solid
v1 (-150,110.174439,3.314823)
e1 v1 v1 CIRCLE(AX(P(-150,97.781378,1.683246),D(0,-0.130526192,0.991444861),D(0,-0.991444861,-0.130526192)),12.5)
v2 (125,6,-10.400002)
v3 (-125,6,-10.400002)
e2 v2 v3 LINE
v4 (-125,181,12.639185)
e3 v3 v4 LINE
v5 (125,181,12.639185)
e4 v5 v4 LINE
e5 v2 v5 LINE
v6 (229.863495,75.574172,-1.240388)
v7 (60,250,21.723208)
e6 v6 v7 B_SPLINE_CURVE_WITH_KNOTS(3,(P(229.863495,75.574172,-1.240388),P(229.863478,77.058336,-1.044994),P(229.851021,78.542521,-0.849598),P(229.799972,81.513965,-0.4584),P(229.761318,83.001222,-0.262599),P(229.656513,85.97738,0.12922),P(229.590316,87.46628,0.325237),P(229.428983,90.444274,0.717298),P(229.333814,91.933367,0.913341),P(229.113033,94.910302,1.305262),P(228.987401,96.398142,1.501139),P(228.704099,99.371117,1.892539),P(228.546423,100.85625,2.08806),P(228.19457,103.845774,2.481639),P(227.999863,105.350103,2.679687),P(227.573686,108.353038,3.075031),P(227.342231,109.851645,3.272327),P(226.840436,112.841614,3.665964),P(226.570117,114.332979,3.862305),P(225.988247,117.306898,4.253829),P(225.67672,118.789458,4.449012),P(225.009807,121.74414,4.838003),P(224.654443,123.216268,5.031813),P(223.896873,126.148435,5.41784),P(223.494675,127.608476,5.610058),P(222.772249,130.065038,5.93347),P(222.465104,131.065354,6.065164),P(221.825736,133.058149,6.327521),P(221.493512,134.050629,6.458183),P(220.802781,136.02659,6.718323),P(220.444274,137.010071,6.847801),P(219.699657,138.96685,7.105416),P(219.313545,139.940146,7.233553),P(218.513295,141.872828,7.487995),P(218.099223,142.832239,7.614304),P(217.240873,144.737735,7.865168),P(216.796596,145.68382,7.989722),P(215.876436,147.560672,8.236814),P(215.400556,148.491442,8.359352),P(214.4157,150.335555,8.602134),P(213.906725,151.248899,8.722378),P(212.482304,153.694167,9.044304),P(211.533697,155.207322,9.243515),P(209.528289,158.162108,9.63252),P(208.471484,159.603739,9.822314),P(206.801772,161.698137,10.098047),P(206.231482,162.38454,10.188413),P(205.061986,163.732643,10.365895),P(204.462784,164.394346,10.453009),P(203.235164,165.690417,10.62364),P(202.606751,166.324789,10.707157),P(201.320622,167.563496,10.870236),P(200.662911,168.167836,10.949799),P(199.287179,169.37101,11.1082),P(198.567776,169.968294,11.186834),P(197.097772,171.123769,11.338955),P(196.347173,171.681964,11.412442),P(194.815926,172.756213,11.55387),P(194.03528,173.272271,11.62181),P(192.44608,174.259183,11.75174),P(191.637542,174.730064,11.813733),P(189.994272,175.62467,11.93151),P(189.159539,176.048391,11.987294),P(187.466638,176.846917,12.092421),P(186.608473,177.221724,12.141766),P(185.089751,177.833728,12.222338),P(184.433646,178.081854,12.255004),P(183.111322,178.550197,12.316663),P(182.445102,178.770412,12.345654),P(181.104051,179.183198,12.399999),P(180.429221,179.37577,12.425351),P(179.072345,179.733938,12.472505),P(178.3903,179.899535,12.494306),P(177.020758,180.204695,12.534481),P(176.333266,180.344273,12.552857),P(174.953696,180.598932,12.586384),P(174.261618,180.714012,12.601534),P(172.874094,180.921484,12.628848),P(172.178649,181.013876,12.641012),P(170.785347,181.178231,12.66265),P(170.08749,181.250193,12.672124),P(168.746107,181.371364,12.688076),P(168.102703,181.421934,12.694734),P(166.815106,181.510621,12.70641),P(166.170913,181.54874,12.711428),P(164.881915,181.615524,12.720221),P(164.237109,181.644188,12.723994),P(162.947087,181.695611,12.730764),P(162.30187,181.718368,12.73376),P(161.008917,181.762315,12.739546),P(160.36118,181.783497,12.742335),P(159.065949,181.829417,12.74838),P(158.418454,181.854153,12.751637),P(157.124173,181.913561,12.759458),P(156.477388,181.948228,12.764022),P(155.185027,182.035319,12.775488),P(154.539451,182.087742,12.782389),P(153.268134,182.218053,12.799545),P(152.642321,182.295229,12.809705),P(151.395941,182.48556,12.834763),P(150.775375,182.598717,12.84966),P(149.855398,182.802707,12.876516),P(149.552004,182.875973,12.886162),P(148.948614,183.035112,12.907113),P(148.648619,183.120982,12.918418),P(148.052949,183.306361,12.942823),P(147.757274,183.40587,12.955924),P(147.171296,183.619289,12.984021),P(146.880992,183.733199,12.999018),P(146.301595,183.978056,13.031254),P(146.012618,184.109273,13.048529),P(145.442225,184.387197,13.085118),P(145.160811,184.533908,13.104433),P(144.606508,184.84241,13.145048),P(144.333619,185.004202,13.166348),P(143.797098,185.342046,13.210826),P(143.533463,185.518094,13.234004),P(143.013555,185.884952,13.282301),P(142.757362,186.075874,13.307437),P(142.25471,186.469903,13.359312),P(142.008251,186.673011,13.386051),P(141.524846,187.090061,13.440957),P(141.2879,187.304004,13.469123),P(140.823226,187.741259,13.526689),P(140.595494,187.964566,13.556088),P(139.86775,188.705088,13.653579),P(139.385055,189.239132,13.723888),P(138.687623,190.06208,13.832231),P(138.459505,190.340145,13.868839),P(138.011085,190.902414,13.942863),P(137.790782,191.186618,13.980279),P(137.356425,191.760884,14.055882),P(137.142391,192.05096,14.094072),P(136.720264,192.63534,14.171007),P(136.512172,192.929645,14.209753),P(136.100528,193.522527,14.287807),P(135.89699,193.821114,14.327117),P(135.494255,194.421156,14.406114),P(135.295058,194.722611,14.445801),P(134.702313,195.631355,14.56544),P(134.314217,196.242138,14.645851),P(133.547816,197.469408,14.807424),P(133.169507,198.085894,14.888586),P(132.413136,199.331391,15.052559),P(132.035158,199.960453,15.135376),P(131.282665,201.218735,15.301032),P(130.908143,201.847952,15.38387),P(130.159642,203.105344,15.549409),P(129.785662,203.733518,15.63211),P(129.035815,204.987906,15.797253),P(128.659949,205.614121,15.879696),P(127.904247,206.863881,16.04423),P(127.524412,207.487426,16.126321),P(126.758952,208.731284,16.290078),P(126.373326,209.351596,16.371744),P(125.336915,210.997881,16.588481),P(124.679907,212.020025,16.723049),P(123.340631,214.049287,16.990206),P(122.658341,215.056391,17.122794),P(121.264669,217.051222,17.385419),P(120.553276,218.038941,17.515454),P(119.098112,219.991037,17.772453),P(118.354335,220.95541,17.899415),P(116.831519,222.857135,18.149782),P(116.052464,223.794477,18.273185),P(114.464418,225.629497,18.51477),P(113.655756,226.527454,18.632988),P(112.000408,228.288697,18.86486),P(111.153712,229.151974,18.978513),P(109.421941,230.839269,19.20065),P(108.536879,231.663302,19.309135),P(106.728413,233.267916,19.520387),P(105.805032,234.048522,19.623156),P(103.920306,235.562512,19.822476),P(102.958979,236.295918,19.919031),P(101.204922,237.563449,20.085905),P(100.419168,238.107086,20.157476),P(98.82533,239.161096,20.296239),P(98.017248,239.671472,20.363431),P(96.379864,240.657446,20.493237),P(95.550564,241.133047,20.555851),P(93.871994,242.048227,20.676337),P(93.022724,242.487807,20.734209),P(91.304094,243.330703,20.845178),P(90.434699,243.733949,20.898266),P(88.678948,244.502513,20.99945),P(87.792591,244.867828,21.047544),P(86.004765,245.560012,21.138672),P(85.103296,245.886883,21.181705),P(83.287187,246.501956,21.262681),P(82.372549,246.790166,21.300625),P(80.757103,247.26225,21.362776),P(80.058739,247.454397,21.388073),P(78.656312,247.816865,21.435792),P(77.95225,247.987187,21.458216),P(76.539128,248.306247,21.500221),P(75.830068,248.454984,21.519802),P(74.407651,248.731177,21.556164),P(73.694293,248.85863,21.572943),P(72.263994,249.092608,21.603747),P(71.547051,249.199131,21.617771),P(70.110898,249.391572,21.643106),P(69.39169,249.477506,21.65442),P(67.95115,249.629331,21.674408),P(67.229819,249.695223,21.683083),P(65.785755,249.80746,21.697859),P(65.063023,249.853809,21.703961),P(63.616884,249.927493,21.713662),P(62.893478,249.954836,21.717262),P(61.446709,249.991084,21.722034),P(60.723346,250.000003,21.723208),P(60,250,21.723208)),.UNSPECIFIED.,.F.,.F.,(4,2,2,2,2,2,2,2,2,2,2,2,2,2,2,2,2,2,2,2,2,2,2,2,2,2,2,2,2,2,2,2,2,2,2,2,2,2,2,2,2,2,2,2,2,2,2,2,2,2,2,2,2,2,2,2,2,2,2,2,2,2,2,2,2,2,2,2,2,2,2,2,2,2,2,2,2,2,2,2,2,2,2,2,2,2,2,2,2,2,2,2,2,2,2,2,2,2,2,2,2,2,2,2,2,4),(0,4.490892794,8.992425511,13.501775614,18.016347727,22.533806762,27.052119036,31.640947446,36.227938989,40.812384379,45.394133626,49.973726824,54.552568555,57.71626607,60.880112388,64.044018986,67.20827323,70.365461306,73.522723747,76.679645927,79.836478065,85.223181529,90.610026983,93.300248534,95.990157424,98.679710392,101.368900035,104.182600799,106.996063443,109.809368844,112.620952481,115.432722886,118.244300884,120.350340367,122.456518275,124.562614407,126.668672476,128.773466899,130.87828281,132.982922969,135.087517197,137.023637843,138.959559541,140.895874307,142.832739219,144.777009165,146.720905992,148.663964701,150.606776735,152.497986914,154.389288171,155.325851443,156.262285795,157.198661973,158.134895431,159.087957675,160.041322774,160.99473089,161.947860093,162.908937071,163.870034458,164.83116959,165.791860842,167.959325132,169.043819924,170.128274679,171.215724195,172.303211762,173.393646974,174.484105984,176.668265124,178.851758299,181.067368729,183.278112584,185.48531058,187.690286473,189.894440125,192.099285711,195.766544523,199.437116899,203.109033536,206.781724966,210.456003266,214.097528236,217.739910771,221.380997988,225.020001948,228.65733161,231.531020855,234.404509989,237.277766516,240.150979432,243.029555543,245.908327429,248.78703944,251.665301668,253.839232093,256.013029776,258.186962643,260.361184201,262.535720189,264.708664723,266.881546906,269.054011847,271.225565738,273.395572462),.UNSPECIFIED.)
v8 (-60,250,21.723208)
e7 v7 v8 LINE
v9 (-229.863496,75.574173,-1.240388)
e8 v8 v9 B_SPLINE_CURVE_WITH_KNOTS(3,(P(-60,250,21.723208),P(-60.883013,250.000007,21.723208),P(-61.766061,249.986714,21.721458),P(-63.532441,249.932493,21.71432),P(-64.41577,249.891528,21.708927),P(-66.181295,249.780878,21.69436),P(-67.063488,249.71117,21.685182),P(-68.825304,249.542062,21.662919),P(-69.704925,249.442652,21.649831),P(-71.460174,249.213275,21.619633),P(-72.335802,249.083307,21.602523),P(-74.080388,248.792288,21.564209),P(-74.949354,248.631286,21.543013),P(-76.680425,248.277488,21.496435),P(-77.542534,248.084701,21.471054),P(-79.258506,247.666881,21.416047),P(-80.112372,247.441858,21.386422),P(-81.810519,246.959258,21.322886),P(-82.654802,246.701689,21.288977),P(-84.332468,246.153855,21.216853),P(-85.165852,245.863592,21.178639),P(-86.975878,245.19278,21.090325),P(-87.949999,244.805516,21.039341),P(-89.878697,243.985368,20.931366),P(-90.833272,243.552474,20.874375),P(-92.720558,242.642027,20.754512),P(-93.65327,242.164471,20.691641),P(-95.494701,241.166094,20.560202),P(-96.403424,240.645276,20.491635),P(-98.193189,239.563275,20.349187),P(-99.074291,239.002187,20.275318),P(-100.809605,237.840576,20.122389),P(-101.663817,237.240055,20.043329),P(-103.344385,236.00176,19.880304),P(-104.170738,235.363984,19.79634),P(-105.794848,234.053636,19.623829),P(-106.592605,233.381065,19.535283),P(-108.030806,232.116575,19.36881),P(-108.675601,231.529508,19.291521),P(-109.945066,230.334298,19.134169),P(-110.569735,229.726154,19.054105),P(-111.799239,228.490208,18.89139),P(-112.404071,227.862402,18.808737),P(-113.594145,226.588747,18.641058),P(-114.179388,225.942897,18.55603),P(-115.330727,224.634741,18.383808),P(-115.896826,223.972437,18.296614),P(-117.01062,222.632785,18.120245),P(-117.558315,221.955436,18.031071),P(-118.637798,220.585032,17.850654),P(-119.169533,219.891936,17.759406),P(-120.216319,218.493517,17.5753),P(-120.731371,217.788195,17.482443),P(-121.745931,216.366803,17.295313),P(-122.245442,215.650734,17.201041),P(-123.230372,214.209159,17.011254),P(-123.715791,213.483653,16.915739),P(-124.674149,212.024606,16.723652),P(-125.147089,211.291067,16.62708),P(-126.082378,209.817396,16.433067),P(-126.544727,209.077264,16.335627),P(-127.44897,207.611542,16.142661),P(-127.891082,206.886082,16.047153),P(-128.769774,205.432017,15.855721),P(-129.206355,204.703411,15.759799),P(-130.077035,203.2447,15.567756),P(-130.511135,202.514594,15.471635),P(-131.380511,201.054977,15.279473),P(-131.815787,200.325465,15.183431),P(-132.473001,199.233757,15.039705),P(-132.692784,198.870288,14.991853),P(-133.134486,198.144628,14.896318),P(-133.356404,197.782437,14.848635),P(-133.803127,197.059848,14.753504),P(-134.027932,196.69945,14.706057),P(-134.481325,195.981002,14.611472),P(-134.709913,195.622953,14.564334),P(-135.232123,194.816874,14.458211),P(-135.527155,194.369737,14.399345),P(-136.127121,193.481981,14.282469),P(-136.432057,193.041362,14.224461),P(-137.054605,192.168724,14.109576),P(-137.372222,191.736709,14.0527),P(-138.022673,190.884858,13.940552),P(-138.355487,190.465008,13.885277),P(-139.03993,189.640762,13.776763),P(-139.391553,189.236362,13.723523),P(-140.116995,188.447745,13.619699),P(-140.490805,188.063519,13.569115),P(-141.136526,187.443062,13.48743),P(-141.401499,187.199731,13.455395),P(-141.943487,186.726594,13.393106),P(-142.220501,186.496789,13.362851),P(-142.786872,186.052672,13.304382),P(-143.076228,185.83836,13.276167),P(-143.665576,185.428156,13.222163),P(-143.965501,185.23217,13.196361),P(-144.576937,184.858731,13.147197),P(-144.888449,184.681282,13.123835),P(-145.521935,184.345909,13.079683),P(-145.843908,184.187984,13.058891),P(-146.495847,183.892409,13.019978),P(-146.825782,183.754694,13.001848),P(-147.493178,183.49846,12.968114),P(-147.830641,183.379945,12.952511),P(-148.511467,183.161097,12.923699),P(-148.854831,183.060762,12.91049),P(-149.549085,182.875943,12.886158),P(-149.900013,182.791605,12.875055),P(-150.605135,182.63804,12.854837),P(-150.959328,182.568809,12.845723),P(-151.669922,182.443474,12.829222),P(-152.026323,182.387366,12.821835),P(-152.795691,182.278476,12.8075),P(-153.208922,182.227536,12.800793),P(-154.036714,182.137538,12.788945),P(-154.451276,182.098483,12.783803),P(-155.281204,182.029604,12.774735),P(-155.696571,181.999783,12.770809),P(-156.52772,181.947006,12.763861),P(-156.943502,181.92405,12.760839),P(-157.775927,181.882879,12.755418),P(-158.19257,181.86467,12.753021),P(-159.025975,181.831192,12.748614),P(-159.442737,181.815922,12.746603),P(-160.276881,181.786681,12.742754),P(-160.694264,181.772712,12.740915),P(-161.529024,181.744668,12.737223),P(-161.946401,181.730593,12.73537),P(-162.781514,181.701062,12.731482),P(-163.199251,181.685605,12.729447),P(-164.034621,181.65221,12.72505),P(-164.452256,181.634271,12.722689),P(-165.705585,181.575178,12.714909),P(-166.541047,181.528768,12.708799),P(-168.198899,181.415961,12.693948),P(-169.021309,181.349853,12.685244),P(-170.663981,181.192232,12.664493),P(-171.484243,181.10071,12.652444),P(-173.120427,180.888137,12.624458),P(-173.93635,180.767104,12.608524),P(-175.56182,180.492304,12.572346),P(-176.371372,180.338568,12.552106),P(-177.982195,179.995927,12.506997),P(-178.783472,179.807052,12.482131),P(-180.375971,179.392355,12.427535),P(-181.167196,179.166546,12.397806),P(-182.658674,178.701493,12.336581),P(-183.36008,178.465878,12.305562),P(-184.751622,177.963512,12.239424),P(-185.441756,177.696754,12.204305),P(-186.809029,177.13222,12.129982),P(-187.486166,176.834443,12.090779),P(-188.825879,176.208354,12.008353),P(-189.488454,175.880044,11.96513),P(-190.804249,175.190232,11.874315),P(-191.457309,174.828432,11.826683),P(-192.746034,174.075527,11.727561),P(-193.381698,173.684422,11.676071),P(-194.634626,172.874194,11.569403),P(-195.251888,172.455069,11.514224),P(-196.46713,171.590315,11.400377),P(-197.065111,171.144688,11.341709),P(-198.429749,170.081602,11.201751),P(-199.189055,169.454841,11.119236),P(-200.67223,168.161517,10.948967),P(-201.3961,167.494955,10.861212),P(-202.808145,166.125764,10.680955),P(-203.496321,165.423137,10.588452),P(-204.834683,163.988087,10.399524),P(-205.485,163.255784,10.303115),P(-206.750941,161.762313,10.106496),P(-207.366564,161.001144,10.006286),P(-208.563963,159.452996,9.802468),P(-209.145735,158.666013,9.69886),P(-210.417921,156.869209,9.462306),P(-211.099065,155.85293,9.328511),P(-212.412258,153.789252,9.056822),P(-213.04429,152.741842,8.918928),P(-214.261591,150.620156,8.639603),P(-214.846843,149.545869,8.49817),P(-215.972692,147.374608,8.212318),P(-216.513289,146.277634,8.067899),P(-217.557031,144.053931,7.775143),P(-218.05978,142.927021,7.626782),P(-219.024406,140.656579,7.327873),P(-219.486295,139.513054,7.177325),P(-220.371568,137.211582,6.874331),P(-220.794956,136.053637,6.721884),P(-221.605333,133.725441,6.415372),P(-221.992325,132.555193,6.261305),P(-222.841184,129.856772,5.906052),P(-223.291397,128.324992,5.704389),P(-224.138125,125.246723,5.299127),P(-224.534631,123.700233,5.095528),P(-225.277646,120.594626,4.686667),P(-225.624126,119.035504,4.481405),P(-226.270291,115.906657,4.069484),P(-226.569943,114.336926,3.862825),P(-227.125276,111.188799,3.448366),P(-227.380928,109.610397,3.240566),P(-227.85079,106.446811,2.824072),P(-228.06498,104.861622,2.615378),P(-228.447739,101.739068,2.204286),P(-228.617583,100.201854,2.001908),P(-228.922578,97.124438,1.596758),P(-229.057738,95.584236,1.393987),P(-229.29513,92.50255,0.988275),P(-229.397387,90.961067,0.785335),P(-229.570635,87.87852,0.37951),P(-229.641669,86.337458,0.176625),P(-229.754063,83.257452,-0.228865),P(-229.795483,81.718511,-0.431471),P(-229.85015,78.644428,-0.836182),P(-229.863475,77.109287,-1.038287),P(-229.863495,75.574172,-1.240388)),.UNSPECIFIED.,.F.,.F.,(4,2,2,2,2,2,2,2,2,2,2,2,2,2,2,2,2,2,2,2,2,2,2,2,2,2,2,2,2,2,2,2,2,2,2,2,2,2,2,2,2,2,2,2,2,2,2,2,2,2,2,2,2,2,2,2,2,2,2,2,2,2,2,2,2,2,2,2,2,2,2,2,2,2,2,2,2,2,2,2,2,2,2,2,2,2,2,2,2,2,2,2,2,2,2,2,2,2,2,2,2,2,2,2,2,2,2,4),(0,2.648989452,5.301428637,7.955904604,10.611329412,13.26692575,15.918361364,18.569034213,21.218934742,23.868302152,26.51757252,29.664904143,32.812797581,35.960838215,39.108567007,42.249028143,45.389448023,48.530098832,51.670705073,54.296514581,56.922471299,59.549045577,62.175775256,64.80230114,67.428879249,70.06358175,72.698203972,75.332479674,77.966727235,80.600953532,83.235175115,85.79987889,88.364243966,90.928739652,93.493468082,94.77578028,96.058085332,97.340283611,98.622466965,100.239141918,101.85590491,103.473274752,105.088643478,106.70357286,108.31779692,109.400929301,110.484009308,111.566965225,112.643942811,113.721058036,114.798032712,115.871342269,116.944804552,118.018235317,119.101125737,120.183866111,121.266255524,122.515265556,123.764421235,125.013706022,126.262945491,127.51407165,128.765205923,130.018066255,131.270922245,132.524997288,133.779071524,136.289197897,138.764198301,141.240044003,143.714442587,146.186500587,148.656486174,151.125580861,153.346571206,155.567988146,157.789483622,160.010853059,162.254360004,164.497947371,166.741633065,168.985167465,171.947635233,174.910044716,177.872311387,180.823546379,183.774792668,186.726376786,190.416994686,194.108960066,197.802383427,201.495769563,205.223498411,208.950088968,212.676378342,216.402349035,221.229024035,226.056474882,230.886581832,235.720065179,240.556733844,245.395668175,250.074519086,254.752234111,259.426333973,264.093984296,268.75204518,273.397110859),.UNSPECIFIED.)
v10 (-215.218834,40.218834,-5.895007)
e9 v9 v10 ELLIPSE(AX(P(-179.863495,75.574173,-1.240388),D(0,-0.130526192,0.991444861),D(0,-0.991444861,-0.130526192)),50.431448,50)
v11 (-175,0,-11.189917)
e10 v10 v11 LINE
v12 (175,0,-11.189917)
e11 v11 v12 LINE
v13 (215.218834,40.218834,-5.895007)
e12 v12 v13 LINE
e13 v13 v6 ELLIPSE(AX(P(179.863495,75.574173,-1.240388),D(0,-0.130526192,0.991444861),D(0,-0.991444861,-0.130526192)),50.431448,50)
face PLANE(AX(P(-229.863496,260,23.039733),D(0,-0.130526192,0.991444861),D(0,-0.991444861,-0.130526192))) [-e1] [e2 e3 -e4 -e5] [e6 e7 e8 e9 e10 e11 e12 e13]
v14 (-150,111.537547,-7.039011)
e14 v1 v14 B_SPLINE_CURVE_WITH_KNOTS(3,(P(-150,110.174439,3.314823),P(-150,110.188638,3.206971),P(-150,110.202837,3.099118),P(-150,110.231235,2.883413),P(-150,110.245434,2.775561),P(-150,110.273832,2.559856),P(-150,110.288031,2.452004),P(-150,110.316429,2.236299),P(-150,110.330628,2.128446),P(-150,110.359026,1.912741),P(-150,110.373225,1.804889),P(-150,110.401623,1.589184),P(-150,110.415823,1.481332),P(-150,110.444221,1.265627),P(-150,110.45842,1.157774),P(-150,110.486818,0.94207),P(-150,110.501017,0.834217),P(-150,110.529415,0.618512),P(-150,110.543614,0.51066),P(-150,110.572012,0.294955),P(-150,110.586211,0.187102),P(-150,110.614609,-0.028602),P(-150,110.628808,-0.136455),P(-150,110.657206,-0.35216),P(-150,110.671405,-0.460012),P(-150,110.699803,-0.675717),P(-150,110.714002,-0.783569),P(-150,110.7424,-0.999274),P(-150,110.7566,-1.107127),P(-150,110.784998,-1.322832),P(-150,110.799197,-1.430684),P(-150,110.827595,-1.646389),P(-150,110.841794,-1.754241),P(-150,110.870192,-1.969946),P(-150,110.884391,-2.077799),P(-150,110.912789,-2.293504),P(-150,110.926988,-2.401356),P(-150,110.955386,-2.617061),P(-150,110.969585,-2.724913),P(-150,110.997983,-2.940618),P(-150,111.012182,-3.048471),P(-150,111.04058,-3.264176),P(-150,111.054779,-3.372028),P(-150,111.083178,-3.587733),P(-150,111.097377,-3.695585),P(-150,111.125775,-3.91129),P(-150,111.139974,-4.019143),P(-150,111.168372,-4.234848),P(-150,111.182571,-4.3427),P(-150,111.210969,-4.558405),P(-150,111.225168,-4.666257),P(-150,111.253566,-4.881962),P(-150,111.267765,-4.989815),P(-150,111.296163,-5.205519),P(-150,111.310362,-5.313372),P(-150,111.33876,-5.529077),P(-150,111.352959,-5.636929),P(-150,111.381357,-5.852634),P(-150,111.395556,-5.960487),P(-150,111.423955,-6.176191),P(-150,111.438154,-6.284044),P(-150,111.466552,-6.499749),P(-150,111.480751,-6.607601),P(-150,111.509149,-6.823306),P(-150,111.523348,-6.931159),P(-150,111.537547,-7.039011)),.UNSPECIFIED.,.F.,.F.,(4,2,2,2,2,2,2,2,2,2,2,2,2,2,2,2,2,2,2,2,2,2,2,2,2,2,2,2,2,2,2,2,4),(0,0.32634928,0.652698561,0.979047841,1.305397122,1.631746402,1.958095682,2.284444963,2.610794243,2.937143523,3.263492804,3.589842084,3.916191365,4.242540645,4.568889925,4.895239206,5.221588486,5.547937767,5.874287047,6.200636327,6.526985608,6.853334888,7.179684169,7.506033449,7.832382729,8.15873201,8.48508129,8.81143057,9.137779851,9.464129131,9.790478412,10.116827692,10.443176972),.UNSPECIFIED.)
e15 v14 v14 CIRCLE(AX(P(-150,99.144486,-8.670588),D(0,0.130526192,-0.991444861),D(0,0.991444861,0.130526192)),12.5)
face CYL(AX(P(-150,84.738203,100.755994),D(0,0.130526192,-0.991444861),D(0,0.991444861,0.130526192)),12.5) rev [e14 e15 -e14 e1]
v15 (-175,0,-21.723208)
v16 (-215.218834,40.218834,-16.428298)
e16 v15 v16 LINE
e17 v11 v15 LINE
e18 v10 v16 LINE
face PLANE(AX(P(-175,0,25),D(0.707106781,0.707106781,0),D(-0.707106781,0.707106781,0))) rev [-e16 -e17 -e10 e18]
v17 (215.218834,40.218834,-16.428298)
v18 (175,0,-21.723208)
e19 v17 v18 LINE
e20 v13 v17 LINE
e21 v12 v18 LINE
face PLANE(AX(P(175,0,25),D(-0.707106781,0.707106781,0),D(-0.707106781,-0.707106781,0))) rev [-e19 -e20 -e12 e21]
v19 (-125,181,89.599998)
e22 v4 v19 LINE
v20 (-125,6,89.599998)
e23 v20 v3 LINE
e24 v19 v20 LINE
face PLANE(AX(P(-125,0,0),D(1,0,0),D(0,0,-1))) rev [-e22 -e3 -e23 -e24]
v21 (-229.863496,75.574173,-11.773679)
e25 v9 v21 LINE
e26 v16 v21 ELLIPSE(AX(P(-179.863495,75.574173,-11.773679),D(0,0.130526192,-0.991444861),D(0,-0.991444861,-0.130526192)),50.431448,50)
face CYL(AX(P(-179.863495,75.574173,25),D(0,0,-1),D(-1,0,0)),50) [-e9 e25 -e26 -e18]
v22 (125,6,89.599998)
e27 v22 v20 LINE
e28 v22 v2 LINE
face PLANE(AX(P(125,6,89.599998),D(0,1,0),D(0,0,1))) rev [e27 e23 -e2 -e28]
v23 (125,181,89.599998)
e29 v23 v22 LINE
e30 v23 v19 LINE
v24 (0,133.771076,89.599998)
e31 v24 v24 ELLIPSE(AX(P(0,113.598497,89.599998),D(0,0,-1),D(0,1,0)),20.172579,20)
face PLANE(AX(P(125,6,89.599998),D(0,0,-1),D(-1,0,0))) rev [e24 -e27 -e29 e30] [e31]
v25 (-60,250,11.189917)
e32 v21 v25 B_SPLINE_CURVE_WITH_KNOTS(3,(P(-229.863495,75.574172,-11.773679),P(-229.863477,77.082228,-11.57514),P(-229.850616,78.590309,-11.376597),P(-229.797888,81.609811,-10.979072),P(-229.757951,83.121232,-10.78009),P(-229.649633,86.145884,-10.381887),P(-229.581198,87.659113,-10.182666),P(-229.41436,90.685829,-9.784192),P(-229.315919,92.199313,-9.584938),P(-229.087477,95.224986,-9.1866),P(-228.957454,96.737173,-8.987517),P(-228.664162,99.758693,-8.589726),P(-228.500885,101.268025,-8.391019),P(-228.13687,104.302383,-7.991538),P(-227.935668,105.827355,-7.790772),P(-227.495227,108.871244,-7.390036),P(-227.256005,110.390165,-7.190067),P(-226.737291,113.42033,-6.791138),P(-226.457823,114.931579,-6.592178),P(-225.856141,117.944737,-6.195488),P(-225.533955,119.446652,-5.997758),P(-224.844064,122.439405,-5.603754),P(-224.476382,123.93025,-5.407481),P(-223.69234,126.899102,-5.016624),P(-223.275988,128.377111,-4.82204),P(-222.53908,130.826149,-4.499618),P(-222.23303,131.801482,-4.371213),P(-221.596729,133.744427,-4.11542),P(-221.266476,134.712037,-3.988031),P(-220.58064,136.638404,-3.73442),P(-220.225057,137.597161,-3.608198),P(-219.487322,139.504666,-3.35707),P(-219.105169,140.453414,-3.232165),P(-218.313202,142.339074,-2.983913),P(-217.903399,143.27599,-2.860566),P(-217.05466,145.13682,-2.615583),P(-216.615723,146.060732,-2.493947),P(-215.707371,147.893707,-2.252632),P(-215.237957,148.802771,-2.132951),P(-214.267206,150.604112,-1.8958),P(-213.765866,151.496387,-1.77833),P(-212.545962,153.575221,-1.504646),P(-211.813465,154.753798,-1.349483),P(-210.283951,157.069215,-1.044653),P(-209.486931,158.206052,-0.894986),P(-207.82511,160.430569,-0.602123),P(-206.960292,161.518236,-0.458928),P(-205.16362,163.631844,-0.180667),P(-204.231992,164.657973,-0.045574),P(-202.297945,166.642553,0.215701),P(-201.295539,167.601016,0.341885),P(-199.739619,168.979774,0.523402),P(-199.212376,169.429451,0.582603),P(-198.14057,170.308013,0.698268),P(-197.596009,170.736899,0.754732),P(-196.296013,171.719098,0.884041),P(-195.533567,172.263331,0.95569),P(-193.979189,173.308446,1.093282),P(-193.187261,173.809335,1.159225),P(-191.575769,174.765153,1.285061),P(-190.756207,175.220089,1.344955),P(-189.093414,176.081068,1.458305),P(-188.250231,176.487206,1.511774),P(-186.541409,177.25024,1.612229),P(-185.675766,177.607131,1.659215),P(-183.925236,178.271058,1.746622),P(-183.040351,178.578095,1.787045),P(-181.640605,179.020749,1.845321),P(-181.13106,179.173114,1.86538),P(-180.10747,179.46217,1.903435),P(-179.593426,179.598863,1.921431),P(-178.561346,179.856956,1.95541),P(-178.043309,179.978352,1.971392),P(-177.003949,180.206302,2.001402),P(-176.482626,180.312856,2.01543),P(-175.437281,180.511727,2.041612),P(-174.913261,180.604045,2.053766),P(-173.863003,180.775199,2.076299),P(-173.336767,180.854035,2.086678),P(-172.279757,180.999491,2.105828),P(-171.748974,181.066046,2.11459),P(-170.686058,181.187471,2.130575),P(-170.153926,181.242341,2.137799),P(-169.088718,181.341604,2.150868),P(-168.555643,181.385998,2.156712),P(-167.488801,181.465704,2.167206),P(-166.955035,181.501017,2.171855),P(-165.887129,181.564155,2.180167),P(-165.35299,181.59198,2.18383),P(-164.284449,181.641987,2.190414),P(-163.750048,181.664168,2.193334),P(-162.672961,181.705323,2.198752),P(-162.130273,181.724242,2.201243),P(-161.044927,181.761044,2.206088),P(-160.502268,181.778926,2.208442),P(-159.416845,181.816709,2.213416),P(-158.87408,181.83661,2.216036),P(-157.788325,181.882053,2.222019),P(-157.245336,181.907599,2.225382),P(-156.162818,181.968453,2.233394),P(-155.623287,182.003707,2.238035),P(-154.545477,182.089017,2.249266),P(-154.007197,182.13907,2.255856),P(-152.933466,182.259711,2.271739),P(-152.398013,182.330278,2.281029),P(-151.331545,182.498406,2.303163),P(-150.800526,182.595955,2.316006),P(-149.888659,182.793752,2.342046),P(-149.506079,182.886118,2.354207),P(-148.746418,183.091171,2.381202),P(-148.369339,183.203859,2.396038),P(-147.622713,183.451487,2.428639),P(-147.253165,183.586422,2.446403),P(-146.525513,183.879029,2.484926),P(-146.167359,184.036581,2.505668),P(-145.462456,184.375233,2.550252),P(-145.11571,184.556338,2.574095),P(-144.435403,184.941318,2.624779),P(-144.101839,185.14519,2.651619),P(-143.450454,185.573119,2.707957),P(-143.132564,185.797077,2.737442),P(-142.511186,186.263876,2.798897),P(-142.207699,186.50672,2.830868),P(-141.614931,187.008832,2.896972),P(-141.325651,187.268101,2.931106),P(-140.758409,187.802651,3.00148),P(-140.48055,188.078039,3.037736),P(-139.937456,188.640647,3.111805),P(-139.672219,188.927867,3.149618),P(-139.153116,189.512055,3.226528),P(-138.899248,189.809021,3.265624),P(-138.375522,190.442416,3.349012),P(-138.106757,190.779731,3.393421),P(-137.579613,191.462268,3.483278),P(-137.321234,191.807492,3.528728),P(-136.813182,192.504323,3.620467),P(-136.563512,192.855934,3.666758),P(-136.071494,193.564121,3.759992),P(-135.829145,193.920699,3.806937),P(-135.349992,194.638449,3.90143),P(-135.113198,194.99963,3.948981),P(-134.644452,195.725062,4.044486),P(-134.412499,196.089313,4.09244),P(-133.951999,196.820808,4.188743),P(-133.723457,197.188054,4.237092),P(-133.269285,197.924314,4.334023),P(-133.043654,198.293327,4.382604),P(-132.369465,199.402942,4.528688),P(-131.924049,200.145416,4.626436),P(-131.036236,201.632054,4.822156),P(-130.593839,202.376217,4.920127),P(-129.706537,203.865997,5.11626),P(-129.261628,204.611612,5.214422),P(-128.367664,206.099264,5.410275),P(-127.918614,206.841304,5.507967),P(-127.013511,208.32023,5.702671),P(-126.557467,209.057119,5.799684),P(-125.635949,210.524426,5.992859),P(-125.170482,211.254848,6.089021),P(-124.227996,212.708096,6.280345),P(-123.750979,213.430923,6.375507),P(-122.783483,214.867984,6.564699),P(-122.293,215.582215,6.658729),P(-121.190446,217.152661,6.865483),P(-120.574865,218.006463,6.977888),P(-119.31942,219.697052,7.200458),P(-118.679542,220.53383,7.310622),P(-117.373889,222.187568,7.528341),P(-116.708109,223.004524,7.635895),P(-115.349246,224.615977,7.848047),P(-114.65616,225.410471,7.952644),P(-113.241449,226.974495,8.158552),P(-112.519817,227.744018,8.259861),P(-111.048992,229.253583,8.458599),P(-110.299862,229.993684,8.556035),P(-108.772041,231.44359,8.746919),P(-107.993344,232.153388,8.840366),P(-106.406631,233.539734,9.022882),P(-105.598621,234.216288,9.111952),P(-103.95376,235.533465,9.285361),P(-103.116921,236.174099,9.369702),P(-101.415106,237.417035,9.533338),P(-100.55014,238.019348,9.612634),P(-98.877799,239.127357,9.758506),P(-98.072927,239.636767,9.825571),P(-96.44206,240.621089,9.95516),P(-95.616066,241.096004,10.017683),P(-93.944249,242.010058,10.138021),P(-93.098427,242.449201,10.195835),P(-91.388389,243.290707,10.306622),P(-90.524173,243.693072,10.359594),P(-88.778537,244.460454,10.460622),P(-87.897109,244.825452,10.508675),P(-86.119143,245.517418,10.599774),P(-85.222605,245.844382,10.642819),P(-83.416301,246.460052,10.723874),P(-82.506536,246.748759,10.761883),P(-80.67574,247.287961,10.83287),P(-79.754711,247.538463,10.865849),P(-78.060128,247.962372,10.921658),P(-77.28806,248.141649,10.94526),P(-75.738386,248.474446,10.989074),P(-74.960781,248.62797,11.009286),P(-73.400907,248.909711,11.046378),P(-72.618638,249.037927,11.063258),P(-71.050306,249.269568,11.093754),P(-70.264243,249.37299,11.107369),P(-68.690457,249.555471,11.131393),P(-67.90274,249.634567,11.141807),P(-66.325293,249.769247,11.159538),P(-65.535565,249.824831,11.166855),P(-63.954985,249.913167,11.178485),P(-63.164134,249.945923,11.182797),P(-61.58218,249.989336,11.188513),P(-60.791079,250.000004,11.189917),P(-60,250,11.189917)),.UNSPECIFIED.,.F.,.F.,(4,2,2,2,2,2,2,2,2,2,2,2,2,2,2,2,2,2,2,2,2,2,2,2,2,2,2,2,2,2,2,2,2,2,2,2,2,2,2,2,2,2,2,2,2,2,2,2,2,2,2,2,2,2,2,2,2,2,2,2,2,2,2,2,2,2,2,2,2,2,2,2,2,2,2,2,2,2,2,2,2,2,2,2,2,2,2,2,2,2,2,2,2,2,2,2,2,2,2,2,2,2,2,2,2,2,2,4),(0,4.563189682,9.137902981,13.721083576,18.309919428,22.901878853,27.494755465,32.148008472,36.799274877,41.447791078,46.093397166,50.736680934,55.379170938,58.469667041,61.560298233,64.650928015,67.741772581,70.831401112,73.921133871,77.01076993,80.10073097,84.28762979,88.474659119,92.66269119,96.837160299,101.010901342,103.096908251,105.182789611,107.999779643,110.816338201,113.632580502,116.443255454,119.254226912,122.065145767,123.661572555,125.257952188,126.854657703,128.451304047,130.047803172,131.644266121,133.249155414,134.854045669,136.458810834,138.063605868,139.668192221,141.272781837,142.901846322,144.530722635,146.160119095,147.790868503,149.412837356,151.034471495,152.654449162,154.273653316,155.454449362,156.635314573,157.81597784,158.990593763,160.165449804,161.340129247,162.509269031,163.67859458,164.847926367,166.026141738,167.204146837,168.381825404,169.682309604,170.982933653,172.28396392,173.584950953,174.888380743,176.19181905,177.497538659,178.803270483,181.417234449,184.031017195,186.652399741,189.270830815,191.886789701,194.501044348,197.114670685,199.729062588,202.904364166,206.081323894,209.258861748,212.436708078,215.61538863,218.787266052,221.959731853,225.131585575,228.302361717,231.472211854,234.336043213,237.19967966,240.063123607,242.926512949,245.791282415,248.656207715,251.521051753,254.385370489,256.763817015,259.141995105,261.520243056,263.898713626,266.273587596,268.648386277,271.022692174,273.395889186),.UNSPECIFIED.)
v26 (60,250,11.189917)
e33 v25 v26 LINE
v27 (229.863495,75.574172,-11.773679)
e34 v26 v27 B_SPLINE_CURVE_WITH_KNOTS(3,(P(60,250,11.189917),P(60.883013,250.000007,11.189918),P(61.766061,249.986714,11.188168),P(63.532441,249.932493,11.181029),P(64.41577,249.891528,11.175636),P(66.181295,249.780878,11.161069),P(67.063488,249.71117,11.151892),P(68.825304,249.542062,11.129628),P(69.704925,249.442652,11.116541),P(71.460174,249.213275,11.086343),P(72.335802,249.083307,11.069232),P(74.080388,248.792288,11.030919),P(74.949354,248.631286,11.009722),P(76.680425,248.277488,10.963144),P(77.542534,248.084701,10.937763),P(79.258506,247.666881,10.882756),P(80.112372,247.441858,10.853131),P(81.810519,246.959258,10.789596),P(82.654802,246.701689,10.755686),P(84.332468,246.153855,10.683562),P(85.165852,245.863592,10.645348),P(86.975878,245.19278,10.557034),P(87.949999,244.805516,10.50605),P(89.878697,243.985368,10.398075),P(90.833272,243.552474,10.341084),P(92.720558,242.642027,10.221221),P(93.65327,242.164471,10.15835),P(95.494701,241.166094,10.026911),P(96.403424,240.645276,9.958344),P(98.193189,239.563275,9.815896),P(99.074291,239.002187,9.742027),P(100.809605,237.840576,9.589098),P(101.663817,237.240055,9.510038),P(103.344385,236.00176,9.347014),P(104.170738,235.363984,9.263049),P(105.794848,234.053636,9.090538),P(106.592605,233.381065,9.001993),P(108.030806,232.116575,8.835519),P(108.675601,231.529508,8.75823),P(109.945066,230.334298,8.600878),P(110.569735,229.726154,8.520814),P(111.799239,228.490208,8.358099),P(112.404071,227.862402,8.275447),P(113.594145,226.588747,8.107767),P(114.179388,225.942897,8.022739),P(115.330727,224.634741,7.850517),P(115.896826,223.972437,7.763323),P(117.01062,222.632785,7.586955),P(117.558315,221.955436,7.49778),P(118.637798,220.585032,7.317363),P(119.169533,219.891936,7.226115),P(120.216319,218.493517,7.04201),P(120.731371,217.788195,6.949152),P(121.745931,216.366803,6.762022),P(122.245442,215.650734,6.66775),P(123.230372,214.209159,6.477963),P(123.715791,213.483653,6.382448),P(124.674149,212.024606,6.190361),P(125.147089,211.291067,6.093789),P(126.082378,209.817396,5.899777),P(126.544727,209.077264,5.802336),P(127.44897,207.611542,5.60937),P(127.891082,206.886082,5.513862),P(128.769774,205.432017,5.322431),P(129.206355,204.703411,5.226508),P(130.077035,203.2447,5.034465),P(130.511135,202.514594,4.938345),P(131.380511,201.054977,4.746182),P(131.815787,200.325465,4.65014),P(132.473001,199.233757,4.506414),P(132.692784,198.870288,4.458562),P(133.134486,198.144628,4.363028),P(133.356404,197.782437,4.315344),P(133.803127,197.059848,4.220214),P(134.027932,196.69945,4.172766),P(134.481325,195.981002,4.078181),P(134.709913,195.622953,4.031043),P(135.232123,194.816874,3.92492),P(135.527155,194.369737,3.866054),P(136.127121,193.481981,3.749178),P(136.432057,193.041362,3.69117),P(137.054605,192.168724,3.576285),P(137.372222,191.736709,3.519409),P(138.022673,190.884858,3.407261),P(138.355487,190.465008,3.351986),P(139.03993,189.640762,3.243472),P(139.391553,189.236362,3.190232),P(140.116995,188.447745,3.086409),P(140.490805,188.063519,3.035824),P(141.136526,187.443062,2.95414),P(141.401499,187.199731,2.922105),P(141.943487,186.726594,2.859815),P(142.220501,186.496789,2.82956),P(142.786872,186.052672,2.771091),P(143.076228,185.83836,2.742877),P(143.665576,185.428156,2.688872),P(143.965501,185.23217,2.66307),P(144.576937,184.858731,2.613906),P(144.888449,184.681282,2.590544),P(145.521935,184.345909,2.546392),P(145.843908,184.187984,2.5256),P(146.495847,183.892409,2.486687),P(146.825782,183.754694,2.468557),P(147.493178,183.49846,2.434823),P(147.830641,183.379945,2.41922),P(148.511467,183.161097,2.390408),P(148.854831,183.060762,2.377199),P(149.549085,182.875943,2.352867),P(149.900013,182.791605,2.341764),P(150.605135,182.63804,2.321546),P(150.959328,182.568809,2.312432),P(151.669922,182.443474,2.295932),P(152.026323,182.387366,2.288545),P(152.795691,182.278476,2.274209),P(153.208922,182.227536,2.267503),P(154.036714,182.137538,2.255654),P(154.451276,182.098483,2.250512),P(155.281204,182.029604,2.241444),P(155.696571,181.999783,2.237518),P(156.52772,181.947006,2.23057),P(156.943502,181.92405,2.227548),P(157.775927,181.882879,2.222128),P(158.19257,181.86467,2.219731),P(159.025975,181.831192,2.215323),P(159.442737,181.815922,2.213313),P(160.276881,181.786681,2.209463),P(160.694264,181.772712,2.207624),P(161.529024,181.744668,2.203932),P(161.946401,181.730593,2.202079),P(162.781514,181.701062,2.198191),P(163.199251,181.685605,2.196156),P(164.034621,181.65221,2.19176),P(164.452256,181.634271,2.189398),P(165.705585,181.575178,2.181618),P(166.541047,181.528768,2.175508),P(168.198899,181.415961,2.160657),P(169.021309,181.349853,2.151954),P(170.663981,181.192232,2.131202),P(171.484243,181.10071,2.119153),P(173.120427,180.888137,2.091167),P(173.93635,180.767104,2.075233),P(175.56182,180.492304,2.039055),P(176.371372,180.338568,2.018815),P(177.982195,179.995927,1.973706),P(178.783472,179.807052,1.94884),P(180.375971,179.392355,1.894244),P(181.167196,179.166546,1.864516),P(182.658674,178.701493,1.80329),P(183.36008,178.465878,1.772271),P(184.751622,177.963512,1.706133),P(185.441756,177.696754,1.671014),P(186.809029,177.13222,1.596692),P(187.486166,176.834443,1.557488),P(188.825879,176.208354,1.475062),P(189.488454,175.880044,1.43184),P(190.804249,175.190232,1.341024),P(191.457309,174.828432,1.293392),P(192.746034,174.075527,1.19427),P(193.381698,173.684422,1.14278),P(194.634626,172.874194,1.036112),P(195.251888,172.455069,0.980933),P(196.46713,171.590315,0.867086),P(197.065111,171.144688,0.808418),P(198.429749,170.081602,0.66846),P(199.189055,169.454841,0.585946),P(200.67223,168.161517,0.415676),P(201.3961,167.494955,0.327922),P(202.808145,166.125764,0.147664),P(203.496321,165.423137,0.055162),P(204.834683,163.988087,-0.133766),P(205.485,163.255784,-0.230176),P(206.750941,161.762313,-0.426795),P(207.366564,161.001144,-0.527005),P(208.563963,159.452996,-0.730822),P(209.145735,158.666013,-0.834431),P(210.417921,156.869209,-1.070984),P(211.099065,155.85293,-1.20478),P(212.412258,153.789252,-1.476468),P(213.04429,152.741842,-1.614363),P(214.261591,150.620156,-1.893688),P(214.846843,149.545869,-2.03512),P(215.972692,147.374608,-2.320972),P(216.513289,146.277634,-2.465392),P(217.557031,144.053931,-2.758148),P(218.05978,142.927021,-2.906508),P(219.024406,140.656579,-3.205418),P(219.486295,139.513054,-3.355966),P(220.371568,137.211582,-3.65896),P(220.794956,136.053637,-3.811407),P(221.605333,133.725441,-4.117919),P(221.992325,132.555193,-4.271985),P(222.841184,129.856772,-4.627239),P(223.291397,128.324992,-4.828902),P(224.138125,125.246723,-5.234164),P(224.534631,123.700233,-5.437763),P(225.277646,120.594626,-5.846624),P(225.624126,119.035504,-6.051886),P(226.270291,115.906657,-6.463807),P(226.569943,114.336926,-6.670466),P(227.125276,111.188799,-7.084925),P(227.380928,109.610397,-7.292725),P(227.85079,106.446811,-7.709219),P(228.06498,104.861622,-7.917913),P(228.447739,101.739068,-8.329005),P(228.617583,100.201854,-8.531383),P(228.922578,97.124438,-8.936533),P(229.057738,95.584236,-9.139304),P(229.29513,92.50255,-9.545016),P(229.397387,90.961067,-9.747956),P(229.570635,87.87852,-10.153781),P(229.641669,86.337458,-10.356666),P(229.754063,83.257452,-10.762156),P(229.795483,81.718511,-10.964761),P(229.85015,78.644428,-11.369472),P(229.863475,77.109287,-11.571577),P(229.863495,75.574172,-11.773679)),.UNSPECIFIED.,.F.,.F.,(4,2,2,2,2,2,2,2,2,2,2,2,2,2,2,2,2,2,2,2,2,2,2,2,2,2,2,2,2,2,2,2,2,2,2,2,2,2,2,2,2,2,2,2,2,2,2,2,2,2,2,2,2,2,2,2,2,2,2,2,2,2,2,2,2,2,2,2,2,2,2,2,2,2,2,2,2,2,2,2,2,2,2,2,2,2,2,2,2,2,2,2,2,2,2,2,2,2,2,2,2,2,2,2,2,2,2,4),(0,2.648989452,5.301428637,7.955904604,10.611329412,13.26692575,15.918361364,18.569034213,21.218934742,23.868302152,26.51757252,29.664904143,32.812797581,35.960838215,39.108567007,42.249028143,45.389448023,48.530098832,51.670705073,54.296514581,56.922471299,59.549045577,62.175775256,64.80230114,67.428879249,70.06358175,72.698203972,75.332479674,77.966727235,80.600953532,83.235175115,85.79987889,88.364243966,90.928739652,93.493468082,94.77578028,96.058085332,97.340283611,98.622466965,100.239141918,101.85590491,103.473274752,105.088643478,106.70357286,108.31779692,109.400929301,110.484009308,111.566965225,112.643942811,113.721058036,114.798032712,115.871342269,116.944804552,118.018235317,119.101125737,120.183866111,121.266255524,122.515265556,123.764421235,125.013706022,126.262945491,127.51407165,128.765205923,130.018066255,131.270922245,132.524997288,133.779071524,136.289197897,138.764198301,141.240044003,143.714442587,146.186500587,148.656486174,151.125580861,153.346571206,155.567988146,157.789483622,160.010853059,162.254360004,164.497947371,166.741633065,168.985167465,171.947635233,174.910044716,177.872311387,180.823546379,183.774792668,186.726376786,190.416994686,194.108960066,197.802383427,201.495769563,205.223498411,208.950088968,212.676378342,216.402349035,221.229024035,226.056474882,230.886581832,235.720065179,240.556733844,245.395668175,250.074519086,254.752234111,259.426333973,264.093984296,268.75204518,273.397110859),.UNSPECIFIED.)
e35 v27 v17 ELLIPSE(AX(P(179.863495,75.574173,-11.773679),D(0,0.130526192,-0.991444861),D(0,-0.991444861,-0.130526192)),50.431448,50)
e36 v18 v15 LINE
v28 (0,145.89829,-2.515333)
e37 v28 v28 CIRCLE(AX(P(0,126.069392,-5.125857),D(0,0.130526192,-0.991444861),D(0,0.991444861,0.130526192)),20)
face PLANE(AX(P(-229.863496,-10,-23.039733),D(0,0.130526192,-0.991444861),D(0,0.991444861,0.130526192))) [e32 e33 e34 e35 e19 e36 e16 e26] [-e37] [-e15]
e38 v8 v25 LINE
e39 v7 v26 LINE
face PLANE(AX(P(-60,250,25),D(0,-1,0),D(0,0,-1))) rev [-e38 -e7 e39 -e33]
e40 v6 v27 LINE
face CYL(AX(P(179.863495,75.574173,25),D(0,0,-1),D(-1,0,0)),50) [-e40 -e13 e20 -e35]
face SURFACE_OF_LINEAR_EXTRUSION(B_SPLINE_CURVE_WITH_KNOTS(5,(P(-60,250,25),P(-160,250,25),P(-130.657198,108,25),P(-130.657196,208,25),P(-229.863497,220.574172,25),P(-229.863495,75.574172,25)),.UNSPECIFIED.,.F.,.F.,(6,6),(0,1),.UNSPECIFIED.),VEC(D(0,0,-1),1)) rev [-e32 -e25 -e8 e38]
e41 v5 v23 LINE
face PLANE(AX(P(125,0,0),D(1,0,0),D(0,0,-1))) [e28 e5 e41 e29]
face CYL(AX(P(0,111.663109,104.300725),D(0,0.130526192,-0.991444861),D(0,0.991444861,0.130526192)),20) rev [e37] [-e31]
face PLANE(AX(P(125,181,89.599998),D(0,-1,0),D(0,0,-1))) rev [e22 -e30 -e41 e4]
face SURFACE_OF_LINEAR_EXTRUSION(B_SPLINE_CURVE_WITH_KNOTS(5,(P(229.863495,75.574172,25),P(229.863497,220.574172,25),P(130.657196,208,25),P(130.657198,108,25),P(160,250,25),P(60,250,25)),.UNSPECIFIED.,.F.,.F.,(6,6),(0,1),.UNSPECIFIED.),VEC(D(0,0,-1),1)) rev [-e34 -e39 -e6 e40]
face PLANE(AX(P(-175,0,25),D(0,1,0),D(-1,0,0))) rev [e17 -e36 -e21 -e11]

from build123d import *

# Parameters (mm, degrees)
BOSS_EXTRUDE1_START     = -25
BOSS_EXTRUDE1_DEPTH     = 50
CUT_EXTRUDE1_DEPTH      = 341.53226913
CUT_EXTRUDE1_DEPTH_BACK = 341.53226913
BOSS_EXTRUDE2_DEPTH     = 125
CUT_EXTRUDE2_DEPTH      = 356.316937075
CUT_EXTRUDE2_DEPTH_BACK = 356.316937075
SKETCH4_R               = 20
CUT_EXTRUDE3_DEPTH      = 356.316937075
CUT_EXTRUDE3_DEPTH_BACK = 356.316937075
SKETCH6_R               = 12.5


# Read off the part's stored shape, not the designer's step: Boss-Extrude1
with BuildPart() as part:
    # Boss-Extrude1 outline → Boss-Extrude1 (new body)
    with BuildSketch(Plane.XY.offset(BOSS_EXTRUDE1_START)):
        with BuildLine():
            Line((175, 0), (215.218833807, 40.218833807))
            ThreePointArc((215.218833807, 40.218833807), (226.057471223, 56.440000887), (229.863494748, 75.574172084))
            add(Edge.make_bspline(
                [(229.863494748, 75.574172084), (229.863497015, 220.574172084), (130.657195822, 208), (130.657198498, 108), (160, 250), (60, 250)],
                knots=[0, 0, 0, 0, 0, 0, 1, 1, 1, 1, 1, 1], degree=5))
            Line((60, 250), (-60, 250))
            add(Edge.make_bspline(
                [(-60, 250), (-160, 250), (-130.657198498, 108), (-130.657195822, 208), (-229.863497015, 220.574172084), (-229.863494748, 75.574172084)],
                knots=[0, 0, 0, 0, 0, 0, 1, 1, 1, 1, 1, 1], degree=5))
            ThreePointArc((-229.863494748, 75.574172084), (-226.057471223, 56.440000887), (-215.218833807, 40.218833807))
            Line((-215.218833807, 40.218833807), (-175, 0))
            Line((-175, 0), (175, 0))
        make_face()
    extrude(amount=BOSS_EXTRUDE1_DEPTH)

    # Sketch2 → Cut-Extrude1 (cut, two sides: drawn at the far end of the back side and taken through both)
    with BuildSketch(Plane(origin=(0, 0, 0), x_dir=(0, 0, -1), z_dir=(1, 0, 0)).offset(-CUT_EXTRUDE1_DEPTH_BACK)):
        Polygon((23.039732542, -10), (-12.506441807, 260), (35, 260), (35, -10), align=None)
        Polygon((-23.039732542, 260), (12.506441807, -10), (-35, -10), (-35, 260), align=None)
    extrude(amount=CUT_EXTRUDE1_DEPTH + CUT_EXTRUDE1_DEPTH_BACK, mode=Mode.SUBTRACT)

    # Sketch7 → Boss-Extrude2 (add, symmetric)
    with BuildSketch(Plane(origin=(0, 0, 0), x_dir=(0, 0, -1), z_dir=(1, 0, 0))):
        Polygon((-89.599998155, 6), (-89.599998155, 181), (-12.639185232, 181), (10.400001845, 6), align=None)
    extrude(amount=BOSS_EXTRUDE2_DEPTH, both=True)

    # Sketch4 → Cut-Extrude2 (cut, two sides: drawn at the far end of the back side and taken through both)
    with BuildSketch(Plane(origin=(0, 2.811189919, -21.353107392), x_dir=(-1, 0, 0), z_dir=(0, 0.13052619222005532, -0.99144486137381)).offset(-CUT_EXTRUDE2_DEPTH_BACK)):
        with Locations(Location((0, 124.321792579, 0), (0, 0, 90))):
            Circle(SKETCH4_R)
    extrude(amount=CUT_EXTRUDE2_DEPTH + CUT_EXTRUDE2_DEPTH_BACK, mode=Mode.SUBTRACT)

    # Sketch6 → Cut-Extrude3 (cut, two sides: drawn at the far end of the back side and taken through both)
    with BuildSketch(Plane(origin=(0, 2.811189919, -21.353107392), x_dir=(-1, 0, 0), z_dir=(0, 0.13052619222005532, -0.99144486137381)).offset(-CUT_EXTRUDE3_DEPTH_BACK)):
        with Locations(Location((150, 97.164552434, 0), (0, 0, 90))):
            Circle(SKETCH6_R)
    extrude(amount=CUT_EXTRUDE3_DEPTH + CUT_EXTRUDE3_DEPTH_BACK, mode=Mode.SUBTRACT)


solid = part.part
